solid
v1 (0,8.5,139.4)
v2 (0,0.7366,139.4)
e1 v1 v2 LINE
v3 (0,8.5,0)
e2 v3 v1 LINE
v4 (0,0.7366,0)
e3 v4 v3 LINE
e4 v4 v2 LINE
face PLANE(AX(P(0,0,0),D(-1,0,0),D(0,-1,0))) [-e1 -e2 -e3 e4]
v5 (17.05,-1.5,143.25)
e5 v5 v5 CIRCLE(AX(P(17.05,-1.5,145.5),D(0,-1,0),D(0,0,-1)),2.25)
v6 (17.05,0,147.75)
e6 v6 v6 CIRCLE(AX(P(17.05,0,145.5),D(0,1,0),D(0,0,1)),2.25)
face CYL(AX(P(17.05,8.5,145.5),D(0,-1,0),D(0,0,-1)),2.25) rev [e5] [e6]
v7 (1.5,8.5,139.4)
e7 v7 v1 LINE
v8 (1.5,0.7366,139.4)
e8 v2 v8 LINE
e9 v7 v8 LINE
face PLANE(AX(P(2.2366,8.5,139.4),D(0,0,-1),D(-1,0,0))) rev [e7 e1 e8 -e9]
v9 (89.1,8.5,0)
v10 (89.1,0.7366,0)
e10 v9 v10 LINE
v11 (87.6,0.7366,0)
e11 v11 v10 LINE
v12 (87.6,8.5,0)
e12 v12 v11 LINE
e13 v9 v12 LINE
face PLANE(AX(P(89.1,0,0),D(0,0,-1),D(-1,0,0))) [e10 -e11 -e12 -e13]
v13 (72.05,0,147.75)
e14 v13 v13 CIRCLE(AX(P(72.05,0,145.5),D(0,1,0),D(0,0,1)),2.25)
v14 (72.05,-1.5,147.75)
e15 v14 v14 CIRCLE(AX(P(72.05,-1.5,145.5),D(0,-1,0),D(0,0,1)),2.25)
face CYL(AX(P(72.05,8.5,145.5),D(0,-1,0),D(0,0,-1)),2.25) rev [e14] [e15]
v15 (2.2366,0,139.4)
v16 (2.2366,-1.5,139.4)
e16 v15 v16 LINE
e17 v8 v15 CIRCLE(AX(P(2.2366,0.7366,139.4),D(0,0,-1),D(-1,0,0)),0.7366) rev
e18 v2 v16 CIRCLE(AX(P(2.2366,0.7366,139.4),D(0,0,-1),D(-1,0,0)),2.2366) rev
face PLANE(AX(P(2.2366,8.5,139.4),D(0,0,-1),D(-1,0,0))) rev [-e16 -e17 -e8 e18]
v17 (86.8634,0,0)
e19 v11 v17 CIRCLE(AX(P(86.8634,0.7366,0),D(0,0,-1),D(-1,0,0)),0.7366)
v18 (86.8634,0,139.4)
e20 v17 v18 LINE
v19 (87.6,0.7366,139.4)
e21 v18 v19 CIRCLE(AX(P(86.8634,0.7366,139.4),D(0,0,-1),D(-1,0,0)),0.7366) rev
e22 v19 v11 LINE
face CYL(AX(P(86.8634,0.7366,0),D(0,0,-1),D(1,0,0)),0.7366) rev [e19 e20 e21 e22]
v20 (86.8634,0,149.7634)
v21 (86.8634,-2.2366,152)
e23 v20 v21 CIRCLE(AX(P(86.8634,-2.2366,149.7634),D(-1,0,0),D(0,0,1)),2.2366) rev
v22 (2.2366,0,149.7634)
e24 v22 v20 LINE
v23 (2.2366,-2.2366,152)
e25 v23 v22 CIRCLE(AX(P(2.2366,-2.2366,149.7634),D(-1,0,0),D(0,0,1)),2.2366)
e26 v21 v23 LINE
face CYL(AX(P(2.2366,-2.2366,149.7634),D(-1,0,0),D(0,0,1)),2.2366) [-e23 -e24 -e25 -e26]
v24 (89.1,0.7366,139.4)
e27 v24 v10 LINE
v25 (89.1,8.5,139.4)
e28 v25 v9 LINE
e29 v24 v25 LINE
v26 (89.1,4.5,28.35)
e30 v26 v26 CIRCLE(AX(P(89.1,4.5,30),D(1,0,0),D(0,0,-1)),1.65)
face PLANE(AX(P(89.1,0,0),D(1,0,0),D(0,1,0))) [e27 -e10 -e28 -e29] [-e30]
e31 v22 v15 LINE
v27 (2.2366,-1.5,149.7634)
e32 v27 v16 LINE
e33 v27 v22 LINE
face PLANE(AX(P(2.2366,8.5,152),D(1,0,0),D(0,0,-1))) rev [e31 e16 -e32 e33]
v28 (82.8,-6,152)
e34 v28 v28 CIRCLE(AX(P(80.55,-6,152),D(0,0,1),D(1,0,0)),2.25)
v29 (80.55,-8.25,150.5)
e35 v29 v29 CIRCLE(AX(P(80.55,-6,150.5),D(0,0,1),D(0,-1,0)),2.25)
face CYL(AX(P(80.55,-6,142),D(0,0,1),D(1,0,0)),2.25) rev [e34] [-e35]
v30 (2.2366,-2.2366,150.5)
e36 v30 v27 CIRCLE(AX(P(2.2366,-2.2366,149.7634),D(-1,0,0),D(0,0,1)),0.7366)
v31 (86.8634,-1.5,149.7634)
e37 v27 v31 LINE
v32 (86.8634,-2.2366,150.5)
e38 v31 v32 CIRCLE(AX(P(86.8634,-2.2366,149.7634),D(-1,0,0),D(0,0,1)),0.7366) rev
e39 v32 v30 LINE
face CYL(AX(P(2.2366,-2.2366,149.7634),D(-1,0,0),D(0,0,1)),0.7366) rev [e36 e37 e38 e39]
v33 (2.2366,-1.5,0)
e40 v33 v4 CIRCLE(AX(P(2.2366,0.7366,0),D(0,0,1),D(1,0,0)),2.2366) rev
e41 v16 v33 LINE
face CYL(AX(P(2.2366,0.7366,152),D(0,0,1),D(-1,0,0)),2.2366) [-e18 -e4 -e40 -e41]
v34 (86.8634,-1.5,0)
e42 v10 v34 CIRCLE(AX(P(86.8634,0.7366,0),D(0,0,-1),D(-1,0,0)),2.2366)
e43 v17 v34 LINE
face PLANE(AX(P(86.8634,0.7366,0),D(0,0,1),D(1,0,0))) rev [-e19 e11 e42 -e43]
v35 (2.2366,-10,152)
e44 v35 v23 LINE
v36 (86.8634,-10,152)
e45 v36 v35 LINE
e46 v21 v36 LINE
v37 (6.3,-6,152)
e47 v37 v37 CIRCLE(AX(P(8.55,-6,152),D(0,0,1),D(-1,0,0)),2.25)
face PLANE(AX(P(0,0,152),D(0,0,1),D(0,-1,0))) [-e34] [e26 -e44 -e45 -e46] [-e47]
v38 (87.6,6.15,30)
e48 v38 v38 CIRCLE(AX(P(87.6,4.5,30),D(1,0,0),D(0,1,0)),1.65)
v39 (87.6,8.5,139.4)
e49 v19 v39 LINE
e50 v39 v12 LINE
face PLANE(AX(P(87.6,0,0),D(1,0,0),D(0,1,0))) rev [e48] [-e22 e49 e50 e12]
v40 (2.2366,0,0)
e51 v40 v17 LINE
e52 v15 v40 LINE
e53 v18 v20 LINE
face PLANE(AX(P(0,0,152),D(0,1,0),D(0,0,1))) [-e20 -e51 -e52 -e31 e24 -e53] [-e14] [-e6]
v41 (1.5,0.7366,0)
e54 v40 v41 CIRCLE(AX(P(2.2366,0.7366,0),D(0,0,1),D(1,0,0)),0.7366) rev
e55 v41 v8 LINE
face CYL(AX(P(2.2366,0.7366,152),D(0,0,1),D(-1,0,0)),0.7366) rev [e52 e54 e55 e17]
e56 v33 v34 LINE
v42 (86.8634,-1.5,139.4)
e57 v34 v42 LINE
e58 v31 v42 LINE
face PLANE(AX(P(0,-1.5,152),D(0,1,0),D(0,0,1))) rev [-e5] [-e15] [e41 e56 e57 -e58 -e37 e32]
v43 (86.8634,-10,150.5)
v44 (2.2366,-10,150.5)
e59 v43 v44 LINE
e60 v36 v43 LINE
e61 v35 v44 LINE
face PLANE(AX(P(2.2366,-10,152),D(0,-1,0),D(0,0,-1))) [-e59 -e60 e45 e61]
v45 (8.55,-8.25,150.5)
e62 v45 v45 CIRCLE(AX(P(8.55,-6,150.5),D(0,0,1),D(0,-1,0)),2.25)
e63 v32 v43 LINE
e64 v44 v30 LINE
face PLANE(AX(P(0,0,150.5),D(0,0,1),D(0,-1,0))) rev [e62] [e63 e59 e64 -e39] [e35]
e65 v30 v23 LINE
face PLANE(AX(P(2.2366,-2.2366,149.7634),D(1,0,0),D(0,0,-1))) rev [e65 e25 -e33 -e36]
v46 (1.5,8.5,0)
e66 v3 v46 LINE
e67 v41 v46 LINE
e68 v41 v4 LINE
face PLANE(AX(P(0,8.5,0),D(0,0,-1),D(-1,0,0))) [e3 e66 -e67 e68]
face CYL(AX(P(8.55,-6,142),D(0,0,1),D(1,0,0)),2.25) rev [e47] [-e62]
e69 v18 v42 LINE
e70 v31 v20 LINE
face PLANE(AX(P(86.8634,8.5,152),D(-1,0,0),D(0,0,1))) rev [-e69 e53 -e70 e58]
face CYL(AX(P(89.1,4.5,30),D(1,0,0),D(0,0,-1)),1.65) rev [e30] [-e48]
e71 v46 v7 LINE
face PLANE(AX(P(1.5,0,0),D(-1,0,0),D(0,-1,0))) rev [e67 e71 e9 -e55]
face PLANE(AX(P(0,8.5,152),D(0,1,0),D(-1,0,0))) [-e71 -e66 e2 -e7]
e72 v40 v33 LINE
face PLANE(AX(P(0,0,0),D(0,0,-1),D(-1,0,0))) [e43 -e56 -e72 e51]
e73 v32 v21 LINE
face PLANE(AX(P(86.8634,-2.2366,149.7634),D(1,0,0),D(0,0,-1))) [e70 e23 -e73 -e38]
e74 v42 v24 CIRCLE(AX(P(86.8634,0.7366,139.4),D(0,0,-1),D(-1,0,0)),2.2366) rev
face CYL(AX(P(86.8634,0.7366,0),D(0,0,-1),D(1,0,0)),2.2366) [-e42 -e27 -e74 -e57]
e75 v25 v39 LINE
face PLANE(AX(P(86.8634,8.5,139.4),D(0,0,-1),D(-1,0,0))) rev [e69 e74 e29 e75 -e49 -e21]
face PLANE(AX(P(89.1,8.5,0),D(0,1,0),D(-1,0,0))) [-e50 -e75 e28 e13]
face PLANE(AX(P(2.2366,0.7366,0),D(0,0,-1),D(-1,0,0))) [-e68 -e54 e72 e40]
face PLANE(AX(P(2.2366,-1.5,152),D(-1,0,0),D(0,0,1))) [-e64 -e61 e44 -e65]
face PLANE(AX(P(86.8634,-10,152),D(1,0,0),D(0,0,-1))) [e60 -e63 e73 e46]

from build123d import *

# Parameters (mm, degrees)
SKETCH_2_W                       = 89.1
SKETCH_2_H                       = 1.5
SM_BASE_FLANGE_1_DEPTH           = 152
SM_EDGE_FLANGE_1_STRIP_W         = 7.4732
SM_EDGE_FLANGE_1_STRIP_H         = 1.5
SM_EDGE_FLANGE_1_STRIP_CUT_DEPTH = 152
SM_EDGE_FLANGE_1_DEPTH           = 152
SM_EDGE_FLANGE_2_STRIP_W         = 7.4732
SM_EDGE_FLANGE_2_STRIP_H         = 1.5
SM_EDGE_FLANGE_2_STRIP_CUT_DEPTH = 152
SM_EDGE_FLANGE_2_DEPTH           = 152
SKETCH_13_W                      = 16.114616681
SKETCH_13_H                      = 12.6
SKETCH_13_W_2                    = 14.895249376
CUT_EXTRUDE_1_DEPTH              = 177.473255764
SM_EDGE_FLANGE_3_STRIP_W         = 7.4732
SM_EDGE_FLANGE_3_STRIP_H         = 1.5
SM_EDGE_FLANGE_3_STRIP_CUT_DEPTH = 84.6268
SM_EDGE_FLANGE_3_DEPTH           = 84.6268
SKETCH_17_R                      = 2.25
CUT_EXTRUDE_2_DEPTH              = 10
SKETCH_18_R                      = 2.25
CUT_EXTRUDE_3_DEPTH              = 10
HOLE_WIZARD_M4_1_D               = 3.3
HOLE_WIZARD_M4_1_DEPTH           = 10.1
HOLE_WIZARD_M4_1_TIP             = 0.991420021


# Sheet-metal steps are written as plain solids
with BuildPart() as part:
    # Sketch 2 → 基体-法兰1 (new body)
    with BuildSketch(Plane.XY):
        with Locations((44.55, -0.75)):
            Rectangle(SKETCH_2_W, SKETCH_2_H)
    extrude(amount=SM_BASE_FLANGE_1_DEPTH)

    # 边线-法兰1 strip (across the edge) → 边线-法兰1 strip cut (cut)
    with BuildSketch(Plane.XY):
        with Locations((-1.5, -0.75)):
            Rectangle(SM_EDGE_FLANGE_1_STRIP_W, SM_EDGE_FLANGE_1_STRIP_H)
    extrude(amount=SM_EDGE_FLANGE_1_STRIP_CUT_DEPTH, mode=Mode.SUBTRACT)

    # 边线-法兰1 section (across the edge) → 边线-法兰1 (add)
    with BuildSketch(Plane.XY):
        with BuildLine():
            Line((0, 0.7366), (0, 8.5))
            Line((0, 8.5), (1.5, 8.5))
            Line((1.5, 8.5), (1.5, 0.7366))
            ThreePointArc((1.5, 0.7366), (1.715745145, 0.215745145), (2.2366, 0))
            Line((2.2366, 0), (2.2366, -1.5))
            ThreePointArc((2.2366, -1.5), (0.655084973, -0.844915027), (0, 0.7366))
        make_face()
    extrude(amount=SM_EDGE_FLANGE_1_DEPTH)

    # 边线-法兰2 strip (across the edge) → 边线-法兰2 strip cut (cut)
    with BuildSketch(Plane(origin=(89.1, 0, 152), x_dir=(-1, 0, 0), z_dir=(0, 0, -1))):
        with Locations((-1.5, -0.75)):
            Rectangle(SM_EDGE_FLANGE_2_STRIP_W, SM_EDGE_FLANGE_2_STRIP_H)
    extrude(amount=SM_EDGE_FLANGE_2_STRIP_CUT_DEPTH, mode=Mode.SUBTRACT)

    # 边线-法兰2 section (across the edge) → 边线-法兰2 (add)
    with BuildSketch(Plane(origin=(89.1, 0, 152), x_dir=(-1, 0, 0), z_dir=(0, 0, -1))):
        with BuildLine():
            Line((0, 0.7366), (0, 8.5))
            Line((0, 8.5), (1.5, 8.5))
            Line((1.5, 8.5), (1.5, 0.7366))
            ThreePointArc((1.5, 0.7366), (1.715745145, 0.215745145), (2.2366, 0))
            Line((2.2366, 0), (2.2366, -1.5))
            ThreePointArc((2.2366, -1.5), (0.655084973, -0.844915027), (0, 0.7366))
        make_face()
    extrude(amount=SM_EDGE_FLANGE_2_DEPTH)

    # 草图13 → 切除-拉伸1 (cut, through all)
    with BuildSketch(Plane.XZ.offset(1.5)):
        with Locations((-5.82070834, 145.7)):
            Rectangle(SKETCH_13_W, SKETCH_13_H)
        with Locations((94.311024688, 145.7)):
            Rectangle(SKETCH_13_W_2, SKETCH_13_H)
    extrude(amount=-CUT_EXTRUDE_1_DEPTH, mode=Mode.SUBTRACT)

    # 边线-法兰3 strip (across the edge) → 边线-法兰3 strip cut (cut)
    with BuildSketch(Plane(origin=(86.8634, -1.5, 152), x_dir=(0, 0, -1), z_dir=(-1, 0, 0))):
        with Locations((-1.5, -0.75)):
            Rectangle(SM_EDGE_FLANGE_3_STRIP_W, SM_EDGE_FLANGE_3_STRIP_H)
    extrude(amount=SM_EDGE_FLANGE_3_STRIP_CUT_DEPTH, mode=Mode.SUBTRACT)

    # 边线-法兰3 section (across the edge) → 边线-法兰3 (add)
    with BuildSketch(Plane(origin=(86.8634, -1.5, 152), x_dir=(0, 0, -1), z_dir=(-1, 0, 0))):
        with BuildLine():
            Line((0, 0.7366), (0, 8.5))
            Line((0, 8.5), (1.5, 8.5))
            Line((1.5, 8.5), (1.5, 0.7366))
            ThreePointArc((1.5, 0.7366), (1.715745145, 0.215745145), (2.2366, 0))
            Line((2.2366, 0), (2.2366, -1.5))
            ThreePointArc((2.2366, -1.5), (0.655084973, -0.844915027), (0, 0.7366))
        make_face()
    extrude(amount=SM_EDGE_FLANGE_3_DEPTH)

    # 草图17 → 切除-拉伸2 (cut)
    with BuildSketch(Plane.XY.offset(152)):
        with Locations((80.55, -6)):
            Circle(SKETCH_17_R)
        with Locations(Location((8.55, -6, 0), (0, 0, 270))):
            Circle(SKETCH_17_R)
    extrude(amount=-CUT_EXTRUDE_2_DEPTH, mode=Mode.SUBTRACT)

    # 草图18 → 切除-拉伸3 (cut)
    with BuildSketch(Plane.XZ.offset(1.5)):
        with Locations(Location((17.05, 145.5, 0), (0, 0, 270))):
            Circle(SKETCH_18_R)
        with Locations(Location((72.05, 145.5, 0), (0, 0, 90))):
            Circle(SKETCH_18_R)
    extrude(amount=-CUT_EXTRUDE_3_DEPTH, mode=Mode.SUBTRACT)

    # M4 螺纹孔1
    with Locations(Plane(origin=(89.1, 0, 0), x_dir=(0, 0, -1), z_dir=(1, 0, 0))):
        with Locations((-30, 4.5)):
            Hole(HOLE_WIZARD_M4_1_D / 2, depth=HOLE_WIZARD_M4_1_DEPTH)
            with Locations((0, 0, -(HOLE_WIZARD_M4_1_DEPTH + HOLE_WIZARD_M4_1_TIP / 2))):  # 118° drill point
                Cone(0, HOLE_WIZARD_M4_1_D / 2, HOLE_WIZARD_M4_1_TIP, mode=Mode.SUBTRACT)


solid = part.part
